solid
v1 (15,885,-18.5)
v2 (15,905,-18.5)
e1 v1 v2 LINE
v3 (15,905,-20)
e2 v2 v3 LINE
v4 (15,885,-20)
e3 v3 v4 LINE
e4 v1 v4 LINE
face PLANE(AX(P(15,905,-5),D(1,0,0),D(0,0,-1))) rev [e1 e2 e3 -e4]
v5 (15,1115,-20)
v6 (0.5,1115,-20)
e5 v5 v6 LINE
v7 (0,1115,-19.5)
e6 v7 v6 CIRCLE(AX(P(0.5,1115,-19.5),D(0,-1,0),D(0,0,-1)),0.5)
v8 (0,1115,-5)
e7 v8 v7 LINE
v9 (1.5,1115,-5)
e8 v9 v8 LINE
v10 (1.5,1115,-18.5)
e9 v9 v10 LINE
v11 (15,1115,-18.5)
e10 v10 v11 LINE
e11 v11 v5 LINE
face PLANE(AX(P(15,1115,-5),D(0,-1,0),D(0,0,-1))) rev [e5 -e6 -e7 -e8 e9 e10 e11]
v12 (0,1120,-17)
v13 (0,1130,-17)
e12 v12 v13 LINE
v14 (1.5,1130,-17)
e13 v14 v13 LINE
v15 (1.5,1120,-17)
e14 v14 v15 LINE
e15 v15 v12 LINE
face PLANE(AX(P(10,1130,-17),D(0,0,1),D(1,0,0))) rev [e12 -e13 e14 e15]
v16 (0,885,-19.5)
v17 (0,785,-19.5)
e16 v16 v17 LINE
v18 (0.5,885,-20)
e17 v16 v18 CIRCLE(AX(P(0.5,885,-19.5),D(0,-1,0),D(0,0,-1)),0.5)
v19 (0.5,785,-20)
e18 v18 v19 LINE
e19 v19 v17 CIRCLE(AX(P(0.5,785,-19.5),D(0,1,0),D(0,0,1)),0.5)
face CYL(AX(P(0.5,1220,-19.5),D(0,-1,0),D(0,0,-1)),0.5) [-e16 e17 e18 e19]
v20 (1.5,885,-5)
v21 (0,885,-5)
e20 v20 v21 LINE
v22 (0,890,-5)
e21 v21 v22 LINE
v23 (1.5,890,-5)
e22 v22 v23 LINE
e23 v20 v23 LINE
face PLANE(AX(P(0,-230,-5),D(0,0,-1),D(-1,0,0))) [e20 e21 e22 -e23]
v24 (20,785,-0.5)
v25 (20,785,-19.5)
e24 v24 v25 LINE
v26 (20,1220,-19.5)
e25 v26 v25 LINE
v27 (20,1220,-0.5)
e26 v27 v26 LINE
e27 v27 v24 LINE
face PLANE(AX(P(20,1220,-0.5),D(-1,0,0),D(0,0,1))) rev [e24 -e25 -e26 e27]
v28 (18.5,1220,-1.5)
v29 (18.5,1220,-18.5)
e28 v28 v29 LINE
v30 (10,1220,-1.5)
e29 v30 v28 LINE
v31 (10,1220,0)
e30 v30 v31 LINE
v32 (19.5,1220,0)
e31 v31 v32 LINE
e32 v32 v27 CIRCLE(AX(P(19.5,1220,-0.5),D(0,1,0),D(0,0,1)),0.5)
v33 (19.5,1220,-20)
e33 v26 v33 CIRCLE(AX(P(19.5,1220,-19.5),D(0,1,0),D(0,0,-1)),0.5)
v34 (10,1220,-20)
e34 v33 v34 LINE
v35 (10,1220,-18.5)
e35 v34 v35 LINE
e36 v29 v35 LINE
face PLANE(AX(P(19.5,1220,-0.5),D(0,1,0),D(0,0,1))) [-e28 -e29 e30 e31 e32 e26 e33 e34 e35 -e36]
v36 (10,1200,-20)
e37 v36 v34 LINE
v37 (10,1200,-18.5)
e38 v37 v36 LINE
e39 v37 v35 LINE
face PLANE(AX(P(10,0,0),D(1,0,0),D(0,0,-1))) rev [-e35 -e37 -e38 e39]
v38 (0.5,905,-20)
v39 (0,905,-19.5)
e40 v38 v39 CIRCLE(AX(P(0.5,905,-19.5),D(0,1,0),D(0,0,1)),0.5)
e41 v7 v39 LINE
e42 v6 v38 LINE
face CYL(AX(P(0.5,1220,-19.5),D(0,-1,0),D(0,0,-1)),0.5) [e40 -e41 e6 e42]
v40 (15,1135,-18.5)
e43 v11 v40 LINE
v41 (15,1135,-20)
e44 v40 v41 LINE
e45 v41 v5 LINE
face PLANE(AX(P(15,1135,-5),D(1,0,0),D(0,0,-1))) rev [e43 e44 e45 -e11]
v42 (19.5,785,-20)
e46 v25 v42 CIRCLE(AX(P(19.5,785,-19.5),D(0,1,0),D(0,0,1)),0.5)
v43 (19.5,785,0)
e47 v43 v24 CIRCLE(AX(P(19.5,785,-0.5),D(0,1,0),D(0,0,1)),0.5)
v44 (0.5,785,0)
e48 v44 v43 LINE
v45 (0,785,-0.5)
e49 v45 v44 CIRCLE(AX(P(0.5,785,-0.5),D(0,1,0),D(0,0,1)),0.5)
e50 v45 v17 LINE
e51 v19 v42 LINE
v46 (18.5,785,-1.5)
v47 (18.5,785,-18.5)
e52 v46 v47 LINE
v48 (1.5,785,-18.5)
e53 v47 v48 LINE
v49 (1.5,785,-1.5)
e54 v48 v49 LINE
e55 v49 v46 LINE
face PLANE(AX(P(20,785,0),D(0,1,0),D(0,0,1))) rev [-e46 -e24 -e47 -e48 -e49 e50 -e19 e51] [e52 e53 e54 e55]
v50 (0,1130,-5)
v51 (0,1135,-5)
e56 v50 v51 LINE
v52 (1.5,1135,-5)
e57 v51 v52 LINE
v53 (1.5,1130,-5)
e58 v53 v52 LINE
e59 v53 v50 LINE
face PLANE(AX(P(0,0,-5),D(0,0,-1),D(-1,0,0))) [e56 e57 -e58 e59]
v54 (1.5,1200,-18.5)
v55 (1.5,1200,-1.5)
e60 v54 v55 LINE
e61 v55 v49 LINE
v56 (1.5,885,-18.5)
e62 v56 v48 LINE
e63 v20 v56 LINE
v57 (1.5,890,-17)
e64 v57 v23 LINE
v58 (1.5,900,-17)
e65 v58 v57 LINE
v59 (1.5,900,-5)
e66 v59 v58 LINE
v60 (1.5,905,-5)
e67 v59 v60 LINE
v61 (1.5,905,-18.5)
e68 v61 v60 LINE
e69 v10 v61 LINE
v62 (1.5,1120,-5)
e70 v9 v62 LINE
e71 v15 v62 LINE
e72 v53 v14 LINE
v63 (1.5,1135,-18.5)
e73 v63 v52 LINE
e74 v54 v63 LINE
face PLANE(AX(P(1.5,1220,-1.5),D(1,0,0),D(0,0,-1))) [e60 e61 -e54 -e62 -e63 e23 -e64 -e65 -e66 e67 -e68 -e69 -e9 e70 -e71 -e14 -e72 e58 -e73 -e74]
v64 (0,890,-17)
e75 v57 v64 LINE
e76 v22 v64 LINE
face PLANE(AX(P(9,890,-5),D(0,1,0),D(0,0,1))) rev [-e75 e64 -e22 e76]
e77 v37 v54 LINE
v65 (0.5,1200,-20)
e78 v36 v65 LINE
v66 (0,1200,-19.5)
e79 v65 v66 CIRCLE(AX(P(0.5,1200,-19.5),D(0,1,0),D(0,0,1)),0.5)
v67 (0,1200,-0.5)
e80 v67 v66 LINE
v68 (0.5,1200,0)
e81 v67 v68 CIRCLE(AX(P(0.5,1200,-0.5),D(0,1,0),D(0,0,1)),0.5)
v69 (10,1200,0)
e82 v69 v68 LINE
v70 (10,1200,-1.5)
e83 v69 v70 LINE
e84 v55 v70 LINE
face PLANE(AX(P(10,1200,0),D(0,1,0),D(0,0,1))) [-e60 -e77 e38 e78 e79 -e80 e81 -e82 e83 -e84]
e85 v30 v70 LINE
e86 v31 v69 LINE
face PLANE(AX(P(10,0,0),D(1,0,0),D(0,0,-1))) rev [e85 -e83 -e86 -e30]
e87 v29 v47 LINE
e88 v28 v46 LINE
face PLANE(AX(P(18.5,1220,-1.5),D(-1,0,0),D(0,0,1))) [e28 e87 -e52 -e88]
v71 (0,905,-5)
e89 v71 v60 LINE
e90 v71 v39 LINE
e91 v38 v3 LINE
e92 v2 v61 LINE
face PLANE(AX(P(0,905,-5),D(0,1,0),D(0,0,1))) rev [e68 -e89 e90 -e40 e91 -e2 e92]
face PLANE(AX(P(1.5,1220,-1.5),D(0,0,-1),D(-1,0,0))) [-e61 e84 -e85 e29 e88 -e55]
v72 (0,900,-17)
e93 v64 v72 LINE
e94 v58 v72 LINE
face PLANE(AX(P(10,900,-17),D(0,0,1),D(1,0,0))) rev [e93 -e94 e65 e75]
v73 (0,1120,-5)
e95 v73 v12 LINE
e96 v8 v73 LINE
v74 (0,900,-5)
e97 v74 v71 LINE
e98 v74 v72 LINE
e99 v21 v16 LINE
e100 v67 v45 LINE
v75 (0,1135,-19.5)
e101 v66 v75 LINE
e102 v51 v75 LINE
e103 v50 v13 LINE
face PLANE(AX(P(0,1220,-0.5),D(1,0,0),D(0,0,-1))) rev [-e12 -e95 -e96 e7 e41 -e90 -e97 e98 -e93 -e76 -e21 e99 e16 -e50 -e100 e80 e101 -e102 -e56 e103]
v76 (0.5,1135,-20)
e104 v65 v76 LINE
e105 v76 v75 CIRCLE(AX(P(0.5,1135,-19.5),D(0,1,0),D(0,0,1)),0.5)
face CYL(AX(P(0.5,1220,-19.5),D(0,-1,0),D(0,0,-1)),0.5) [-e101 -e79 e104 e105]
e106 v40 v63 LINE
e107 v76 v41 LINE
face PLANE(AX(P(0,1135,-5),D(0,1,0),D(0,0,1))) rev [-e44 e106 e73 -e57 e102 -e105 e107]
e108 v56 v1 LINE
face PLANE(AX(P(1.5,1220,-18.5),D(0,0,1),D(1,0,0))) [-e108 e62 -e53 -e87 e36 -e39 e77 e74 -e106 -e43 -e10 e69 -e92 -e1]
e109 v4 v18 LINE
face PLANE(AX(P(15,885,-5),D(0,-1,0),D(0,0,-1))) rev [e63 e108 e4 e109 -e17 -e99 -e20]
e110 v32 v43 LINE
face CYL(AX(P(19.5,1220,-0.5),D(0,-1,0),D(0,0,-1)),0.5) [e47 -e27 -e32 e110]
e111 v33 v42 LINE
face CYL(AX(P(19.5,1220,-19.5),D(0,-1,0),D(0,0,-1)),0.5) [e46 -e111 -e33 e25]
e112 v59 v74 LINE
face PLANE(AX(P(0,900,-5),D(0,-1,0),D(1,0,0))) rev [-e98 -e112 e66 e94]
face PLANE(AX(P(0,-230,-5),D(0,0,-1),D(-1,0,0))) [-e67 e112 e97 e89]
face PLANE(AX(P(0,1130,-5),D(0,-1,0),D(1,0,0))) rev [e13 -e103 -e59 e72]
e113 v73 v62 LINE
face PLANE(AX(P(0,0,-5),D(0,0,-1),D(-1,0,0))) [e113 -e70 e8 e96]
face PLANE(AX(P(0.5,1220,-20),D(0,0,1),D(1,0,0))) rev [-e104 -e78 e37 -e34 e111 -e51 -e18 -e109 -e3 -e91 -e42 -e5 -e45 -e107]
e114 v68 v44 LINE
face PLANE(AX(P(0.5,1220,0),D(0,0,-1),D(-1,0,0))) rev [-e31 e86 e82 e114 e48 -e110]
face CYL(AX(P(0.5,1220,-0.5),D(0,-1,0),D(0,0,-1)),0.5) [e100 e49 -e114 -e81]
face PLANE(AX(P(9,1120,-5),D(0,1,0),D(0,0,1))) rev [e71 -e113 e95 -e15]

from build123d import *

# Parameters (mm, degrees)
SKETCH1_W                   = 17
SKETCH1_H                   = 17
BOSS_EXTRUDE1_DEPTH         = 1220
CUT_EXTRUDE1_START          = -20
SKETCH2_W                   = 20
SKETCH2_H                   = 20
CUT_EXTRUDE1_DEPTH          = 10
CUT_EXTRUDE2_DEPTH          = 15
SKETCH4_W                   = 3
SKETCH4_H                   = 10
CUT_EXTRUDE3_DEPTH          = 10
SKETCH_PATTERN1_START       = -20
SKETCH_PATTERN1_DEPTH       = 15
SKETCH_PATTERN1_2_OUTLINE_W = 1.5
SKETCH_PATTERN1_2_OUTLINE_H = 10
SKETCH_PATTERN1_2_DEPTH     = 3
SKETCH6_W                   = 20
SKETCH6_H                   = 785
CUT_EXTRUDE4_DEPTH          = 1221.327824808


# Read off the part's stored shape, not the designer's step: Sketch-Pattern1
with BuildPart() as part:
    # Sketch1 → Boss-Extrude1 (new body)
    with BuildSketch(Plane(origin=(0, 0, 0), x_dir=(1, 0, 0), z_dir=(0, 1, 0))):
        with BuildLine():
            Line((0.5, 0), (19.5, 0))
            ThreePointArc((19.5, 0), (19.853553391, 0.146446609), (20, 0.5))
            Line((20, 0.5), (20, 19.5))
            ThreePointArc((20, 19.5), (19.853553391, 19.853553391), (19.5, 20))
            Line((19.5, 20), (0.5, 20))
            ThreePointArc((0.5, 20), (0.146446609, 19.853553391), (0, 19.5))
            Line((0, 19.5), (0, 0.5))
            ThreePointArc((0, 0.5), (0.146446609, 0.146446609), (0.5, 0))
        make_face()
        with Locations((10, 10)):
            Rectangle(SKETCH1_W, SKETCH1_H, mode=Mode.SUBTRACT)
    extrude(amount=BOSS_EXTRUDE1_DEPTH)

    # Sketch2 → Cut-Extrude1 (cut)
    with BuildSketch(Plane(origin=(20, 0, 0), x_dir=(0, 0, -1), z_dir=(1, 0, 0)).offset(CUT_EXTRUDE1_START)):
        with Locations((10, 1210)):
            Rectangle(SKETCH2_W, SKETCH2_H)
        with Locations((10, 10)):
            Rectangle(SKETCH2_W, SKETCH2_H)
    extrude(amount=CUT_EXTRUDE1_DEPTH, mode=Mode.SUBTRACT)

    # Sketch3 → Cut-Extrude2 (cut)
    with BuildSketch(Plane(origin=(0, 0, -20), x_dir=(-1, 0, 0), z_dir=(0, 0, -1))):
        Polygon((-15, 1115), (0, 1115), (0, 1120), (-9, 1120), (-9, 1130), (0, 1130), (0, 1135), (-15, 1135), align=None)
    extrude(amount=-CUT_EXTRUDE2_DEPTH, mode=Mode.SUBTRACT)

    # Sketch4 → Cut-Extrude3 (cut)
    with BuildSketch(Plane.ZY):
        with Locations((-18.5, 1125)):
            Rectangle(SKETCH4_W, SKETCH4_H)
    extrude(amount=-CUT_EXTRUDE3_DEPTH, mode=Mode.SUBTRACT)

    # Sketch-Pattern1 outline → Sketch-Pattern1 (cut)
    with BuildSketch(Plane.XY.offset(SKETCH_PATTERN1_START)):
        Polygon((15, 85), (15, 105), (0, 105), (0, 100), (1.5, 100), (1.5, 90), (0, 90), (0, 85), align=None)
        Polygon((1.5, 330), (1.5, 320), (0, 320), (0, 315), (15, 315), (15, 335), (0, 335), (0, 330), align=None)
        Polygon((1.5, 500), (1.5, 490), (0, 490), (0, 485), (15, 485), (15, 505), (0, 505), (0, 500), align=None)
        Polygon((1.5, 730), (1.5, 720), (0, 720), (0, 715), (15, 715), (15, 735), (0, 735), (0, 730), align=None)
        Polygon((1.5, 900), (1.5, 890), (0, 890), (0, 885), (15, 885), (15, 905), (0, 905), (0, 900), align=None)
    extrude(amount=SKETCH_PATTERN1_DEPTH, mode=Mode.SUBTRACT)

    # Sketch-Pattern1 2 outline → Sketch-Pattern1 2 (cut)
    with BuildSketch(Plane.XY.offset(SKETCH_PATTERN1_START)):
        with Locations((0.75, 95)):
            Rectangle(SKETCH_PATTERN1_2_OUTLINE_W, SKETCH_PATTERN1_2_OUTLINE_H)
        with Locations((0.75, 325)):
            Rectangle(SKETCH_PATTERN1_2_OUTLINE_W, SKETCH_PATTERN1_2_OUTLINE_H)
        with Locations((0.75, 495)):
            Rectangle(SKETCH_PATTERN1_2_OUTLINE_W, SKETCH_PATTERN1_2_OUTLINE_H)
        with Locations((0.75, 725)):
            Rectangle(SKETCH_PATTERN1_2_OUTLINE_W, SKETCH_PATTERN1_2_OUTLINE_H)
        with Locations((0.75, 895)):
            Rectangle(SKETCH_PATTERN1_2_OUTLINE_W, SKETCH_PATTERN1_2_OUTLINE_H)
    extrude(amount=SKETCH_PATTERN1_2_DEPTH, mode=Mode.SUBTRACT)

    # Sketch6 → Cut-Extrude4 (cut, through all)
    with BuildSketch(Plane(origin=(0, 0, -20), x_dir=(-1, 0, 0), z_dir=(0, 0, -1))):
        with Locations((-10, 392.5)):
            Rectangle(SKETCH6_W, SKETCH6_H)
    extrude(amount=-CUT_EXTRUDE4_DEPTH, mode=Mode.SUBTRACT)


solid = part.part
